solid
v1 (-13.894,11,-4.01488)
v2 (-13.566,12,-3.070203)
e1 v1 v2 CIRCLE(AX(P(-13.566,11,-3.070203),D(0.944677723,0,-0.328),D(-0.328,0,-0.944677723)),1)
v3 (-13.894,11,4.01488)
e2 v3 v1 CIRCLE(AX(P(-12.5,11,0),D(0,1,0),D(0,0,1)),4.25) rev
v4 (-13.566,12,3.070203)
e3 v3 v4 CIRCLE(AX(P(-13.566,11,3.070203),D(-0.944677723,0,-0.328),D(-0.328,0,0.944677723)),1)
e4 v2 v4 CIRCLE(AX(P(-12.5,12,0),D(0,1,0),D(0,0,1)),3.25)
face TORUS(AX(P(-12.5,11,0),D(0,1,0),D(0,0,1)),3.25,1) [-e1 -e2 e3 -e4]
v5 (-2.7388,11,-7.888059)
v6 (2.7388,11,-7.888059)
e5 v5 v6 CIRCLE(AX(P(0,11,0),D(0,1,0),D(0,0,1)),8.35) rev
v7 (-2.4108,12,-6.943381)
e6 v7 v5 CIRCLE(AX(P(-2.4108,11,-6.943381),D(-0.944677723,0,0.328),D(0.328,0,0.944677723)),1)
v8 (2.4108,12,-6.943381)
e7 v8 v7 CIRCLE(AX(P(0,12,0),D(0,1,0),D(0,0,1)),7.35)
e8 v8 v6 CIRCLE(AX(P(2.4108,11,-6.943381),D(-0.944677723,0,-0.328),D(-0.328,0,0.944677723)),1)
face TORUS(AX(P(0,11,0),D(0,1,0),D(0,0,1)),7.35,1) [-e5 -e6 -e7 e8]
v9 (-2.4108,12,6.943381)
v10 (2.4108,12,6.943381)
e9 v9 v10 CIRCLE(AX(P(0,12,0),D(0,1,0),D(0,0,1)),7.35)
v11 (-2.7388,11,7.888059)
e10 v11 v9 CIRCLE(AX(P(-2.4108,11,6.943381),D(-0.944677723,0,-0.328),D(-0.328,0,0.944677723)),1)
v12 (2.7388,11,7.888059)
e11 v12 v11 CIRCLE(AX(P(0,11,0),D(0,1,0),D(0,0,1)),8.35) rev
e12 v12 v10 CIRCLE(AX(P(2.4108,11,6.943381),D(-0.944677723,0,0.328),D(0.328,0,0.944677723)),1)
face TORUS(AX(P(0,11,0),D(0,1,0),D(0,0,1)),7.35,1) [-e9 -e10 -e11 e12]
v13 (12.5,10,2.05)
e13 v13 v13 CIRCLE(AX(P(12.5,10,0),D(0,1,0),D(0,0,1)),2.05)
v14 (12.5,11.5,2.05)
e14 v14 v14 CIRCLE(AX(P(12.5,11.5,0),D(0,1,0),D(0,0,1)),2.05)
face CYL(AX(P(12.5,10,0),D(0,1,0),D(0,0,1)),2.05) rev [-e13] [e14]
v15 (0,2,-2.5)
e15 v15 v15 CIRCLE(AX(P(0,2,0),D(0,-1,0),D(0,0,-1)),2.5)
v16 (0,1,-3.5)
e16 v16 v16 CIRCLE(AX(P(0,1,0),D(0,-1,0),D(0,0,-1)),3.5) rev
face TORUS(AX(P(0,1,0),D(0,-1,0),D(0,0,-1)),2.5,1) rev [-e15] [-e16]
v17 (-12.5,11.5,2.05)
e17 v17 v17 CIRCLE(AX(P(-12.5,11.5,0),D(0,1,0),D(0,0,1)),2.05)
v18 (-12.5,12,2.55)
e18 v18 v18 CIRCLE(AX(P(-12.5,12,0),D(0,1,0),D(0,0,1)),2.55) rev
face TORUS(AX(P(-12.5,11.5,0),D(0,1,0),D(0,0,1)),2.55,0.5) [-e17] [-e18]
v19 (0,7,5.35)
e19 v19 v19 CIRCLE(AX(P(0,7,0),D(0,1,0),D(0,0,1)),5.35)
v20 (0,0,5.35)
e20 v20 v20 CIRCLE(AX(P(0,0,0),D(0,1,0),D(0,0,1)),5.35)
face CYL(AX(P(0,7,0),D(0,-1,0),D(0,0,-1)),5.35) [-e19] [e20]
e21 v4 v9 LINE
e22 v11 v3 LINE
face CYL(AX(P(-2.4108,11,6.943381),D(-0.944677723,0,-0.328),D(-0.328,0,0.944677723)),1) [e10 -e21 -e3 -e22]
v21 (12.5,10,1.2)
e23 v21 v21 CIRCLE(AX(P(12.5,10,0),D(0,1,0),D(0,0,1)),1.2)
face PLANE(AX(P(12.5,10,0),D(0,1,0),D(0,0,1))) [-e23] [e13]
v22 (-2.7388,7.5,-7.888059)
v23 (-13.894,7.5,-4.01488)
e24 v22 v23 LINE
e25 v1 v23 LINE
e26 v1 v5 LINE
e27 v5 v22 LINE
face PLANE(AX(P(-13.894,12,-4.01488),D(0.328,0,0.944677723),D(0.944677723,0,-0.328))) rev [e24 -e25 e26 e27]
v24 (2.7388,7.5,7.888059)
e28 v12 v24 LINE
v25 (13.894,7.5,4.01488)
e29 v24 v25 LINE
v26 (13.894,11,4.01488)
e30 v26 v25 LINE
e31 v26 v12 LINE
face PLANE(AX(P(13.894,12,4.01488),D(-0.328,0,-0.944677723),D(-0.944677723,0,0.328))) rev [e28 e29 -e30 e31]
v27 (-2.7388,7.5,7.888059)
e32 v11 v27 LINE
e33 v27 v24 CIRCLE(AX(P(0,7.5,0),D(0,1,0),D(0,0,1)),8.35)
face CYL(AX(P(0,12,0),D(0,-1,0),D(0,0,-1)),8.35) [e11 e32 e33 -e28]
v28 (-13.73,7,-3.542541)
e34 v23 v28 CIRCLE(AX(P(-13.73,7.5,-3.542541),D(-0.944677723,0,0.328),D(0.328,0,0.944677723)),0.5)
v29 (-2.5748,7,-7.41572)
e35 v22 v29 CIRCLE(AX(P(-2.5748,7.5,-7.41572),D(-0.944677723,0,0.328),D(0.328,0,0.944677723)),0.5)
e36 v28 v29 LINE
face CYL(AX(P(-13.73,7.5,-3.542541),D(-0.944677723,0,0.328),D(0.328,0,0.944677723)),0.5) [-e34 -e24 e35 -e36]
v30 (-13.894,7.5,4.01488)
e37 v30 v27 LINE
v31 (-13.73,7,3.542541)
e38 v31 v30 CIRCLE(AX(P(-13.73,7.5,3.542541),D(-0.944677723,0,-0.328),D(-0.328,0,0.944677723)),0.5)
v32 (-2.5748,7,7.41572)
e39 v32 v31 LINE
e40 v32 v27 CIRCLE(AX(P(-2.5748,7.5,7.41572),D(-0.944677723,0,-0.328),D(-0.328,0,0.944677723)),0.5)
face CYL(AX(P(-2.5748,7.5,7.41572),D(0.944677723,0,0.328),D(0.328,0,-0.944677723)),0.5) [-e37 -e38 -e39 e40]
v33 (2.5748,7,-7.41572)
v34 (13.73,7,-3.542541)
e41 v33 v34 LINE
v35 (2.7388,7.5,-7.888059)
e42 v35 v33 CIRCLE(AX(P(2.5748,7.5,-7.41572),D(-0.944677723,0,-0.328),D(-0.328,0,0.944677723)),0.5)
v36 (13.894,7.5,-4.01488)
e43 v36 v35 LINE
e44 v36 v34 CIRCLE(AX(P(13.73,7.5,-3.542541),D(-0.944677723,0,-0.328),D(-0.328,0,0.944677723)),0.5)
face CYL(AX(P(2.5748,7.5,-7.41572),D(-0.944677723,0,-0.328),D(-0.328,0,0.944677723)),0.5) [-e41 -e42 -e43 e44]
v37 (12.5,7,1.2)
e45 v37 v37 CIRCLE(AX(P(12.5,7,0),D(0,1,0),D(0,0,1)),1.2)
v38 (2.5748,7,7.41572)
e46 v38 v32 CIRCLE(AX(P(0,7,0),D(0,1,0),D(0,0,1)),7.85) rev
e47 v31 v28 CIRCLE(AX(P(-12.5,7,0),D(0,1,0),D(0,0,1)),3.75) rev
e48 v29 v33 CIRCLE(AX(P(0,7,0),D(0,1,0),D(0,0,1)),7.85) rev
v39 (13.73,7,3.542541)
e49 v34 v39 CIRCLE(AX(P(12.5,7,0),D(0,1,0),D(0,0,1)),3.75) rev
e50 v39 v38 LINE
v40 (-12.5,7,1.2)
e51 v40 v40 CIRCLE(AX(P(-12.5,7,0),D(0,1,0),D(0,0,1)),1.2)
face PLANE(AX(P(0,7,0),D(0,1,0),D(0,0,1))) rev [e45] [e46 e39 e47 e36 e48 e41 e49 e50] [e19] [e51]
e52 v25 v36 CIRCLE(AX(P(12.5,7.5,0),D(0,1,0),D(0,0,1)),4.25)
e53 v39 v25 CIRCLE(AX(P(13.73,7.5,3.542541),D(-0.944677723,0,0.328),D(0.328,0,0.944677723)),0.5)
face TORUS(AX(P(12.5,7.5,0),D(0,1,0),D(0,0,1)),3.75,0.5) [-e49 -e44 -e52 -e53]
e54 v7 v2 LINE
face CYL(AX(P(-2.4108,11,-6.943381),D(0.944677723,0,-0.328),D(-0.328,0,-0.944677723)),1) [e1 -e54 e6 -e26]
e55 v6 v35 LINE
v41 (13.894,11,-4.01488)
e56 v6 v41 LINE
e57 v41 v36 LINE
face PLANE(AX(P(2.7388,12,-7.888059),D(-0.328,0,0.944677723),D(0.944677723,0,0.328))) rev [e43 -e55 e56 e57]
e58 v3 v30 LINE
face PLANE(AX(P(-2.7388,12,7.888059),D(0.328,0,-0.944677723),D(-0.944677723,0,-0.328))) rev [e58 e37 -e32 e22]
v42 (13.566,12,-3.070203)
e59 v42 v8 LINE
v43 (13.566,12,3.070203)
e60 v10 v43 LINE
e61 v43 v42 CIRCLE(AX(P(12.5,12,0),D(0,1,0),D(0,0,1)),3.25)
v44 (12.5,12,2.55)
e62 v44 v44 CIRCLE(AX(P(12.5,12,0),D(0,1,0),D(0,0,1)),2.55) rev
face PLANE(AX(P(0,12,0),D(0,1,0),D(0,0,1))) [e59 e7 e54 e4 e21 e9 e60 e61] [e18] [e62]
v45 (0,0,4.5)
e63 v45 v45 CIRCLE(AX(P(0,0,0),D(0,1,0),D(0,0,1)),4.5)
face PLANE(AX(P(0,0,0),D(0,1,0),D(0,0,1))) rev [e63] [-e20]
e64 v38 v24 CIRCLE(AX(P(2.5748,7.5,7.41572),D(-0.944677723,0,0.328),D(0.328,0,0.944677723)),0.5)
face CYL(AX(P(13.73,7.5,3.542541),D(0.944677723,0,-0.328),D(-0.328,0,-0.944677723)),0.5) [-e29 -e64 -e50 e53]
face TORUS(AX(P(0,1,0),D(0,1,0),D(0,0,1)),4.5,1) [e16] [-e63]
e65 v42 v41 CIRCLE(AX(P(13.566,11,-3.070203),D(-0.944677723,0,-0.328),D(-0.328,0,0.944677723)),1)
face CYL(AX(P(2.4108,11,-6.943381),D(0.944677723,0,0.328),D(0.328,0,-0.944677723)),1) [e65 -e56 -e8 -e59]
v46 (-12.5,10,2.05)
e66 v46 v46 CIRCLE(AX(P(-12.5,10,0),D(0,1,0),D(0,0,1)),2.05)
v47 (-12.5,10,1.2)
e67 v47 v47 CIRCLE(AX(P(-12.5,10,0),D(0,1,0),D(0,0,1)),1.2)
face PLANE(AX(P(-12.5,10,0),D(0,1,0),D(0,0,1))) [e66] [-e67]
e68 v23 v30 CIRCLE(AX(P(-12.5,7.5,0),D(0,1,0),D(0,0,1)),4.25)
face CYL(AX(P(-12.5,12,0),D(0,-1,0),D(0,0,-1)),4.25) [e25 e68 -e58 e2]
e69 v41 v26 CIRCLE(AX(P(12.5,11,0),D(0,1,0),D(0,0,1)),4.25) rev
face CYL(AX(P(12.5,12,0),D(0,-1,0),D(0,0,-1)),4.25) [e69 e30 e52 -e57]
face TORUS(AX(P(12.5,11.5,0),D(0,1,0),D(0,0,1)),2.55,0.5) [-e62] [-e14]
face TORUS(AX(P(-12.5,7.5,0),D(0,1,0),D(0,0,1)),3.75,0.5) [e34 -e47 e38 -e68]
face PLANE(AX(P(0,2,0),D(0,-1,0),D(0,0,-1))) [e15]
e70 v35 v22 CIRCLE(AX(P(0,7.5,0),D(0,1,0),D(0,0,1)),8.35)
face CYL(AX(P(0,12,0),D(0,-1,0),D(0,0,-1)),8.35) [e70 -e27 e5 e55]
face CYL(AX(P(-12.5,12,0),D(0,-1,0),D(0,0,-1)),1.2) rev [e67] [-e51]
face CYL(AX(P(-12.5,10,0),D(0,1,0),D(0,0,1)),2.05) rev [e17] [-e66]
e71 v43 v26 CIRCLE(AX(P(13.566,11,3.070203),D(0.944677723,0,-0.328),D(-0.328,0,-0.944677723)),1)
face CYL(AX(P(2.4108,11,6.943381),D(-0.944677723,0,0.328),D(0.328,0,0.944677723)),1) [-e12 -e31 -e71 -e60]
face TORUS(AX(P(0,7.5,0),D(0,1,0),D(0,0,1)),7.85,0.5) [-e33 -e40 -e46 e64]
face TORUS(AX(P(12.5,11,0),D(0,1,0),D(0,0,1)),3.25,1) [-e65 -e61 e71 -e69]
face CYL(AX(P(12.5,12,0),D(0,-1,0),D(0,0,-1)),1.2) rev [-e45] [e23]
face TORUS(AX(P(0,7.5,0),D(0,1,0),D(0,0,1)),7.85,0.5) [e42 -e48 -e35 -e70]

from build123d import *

# Parameters (mm, degrees)
SKETCH1_R           = 5.35
BOSS_EXTRUDE1_DEPTH = 7
SKETCH2_R           = 1.2
BOSS_EXTRUDE2_DEPTH = 5
SKETCH3_R           = 2.05
CUT_EXTRUDE1_DEPTH  = 2
FILLET1_R           = 0.5
FILLET2_R           = 1
SKETCH4_R           = 3.5
CUT_EXTRUDE2_DEPTH  = 2
FILLET3_R           = 1


with BuildPart() as part:
    # Sketch1 → Boss-Extrude1 (new body)
    with BuildSketch(Plane(origin=(0, 0, 0), x_dir=(1, 0, 0), z_dir=(0, 1, 0))):
        with Locations(Location((0, 0, 0), (0, 0, 270))):
            Circle(SKETCH1_R)
    extrude(amount=BOSS_EXTRUDE1_DEPTH)

    # Sketch2 → Boss-Extrude2 (add)
    with BuildSketch(Plane(origin=(0, 7, 0), x_dir=(1, 0, 0), z_dir=(0, 1, 0))):
        with BuildLine():
            Line((2.7388, 7.888058986), (13.894, 4.014880322))
            ThreePointArc((13.894, 4.014880322), (16.75, 0), (13.894, -4.014880322))
            Line((13.894, -4.014880322), (2.7388, -7.888058986))
            ThreePointArc((2.7388, -7.888058986), (0, -8.35), (-2.7388, -7.888058986))
            Line((-2.7388, -7.888058986), (-13.894, -4.014880322))
            ThreePointArc((-13.894, -4.014880322), (-16.75, 0), (-13.894, 4.014880322))
            Line((-13.894, 4.014880322), (-2.7388, 7.888058986))
            ThreePointArc((-2.7388, 7.888058986), (0, 8.35), (2.7388, 7.888058986))
        make_face()
        with Locations(Location((12.5, 0, 0), (0, 0, 270))):
            Circle(SKETCH2_R, mode=Mode.SUBTRACT)
        with Locations(Location((-12.5, 0, 0), (0, 0, 270))):
            Circle(SKETCH2_R, mode=Mode.SUBTRACT)
    extrude(amount=BOSS_EXTRUDE2_DEPTH)

    # Sketch3 → Cut-Extrude1 (cut)
    with BuildSketch(Plane(origin=(0, 12, 0), x_dir=(1, 0, 0), z_dir=(0, 1, 0))):
        with Locations(Location((-12.5, 0, 0), (0, 0, 270))):
            Circle(SKETCH3_R)
        with Locations(Location((12.5, 0, 0), (0, 0, 270))):
            Circle(SKETCH3_R)
    extrude(amount=-CUT_EXTRUDE1_DEPTH, mode=Mode.SUBTRACT)

    # Fillet1
    fillet1_edges = [part.edges().sort_by_distance(p)[0] for p in [
        (-8.3164, 7, 5.951469654),
        (0, 7, 8.35),
        (8.3164, 7, 5.951469654),
        (16.75, 7, 0),
        (8.3164, 7, -5.951469654),
        (-12.5, 12, -2.05),
        (12.5, 12, -2.05),
        (0, 7, -8.35),
        (-8.3164, 7, -5.951469654),
        (-16.75, 7, 0),
    ]]
    fillet(fillet1_edges, radius=FILLET1_R)

    # Fillet2
    fillet2_edges = [part.edges().sort_by_distance(p)[0] for p in [
        (0, 12, -8.35),
        (-8.3164, 12, -5.951469654),
        (-16.75, 12, 0),
        (-8.3164, 12, 5.951469654),
        (0, 12, 8.35),
        (8.3164, 12, 5.951469654),
        (16.75, 12, 0),
        (8.3164, 12, -5.951469654),
    ]]
    fillet(fillet2_edges, radius=FILLET2_R)

    # Sketch4 → Cut-Extrude2 (cut)
    with BuildSketch(Plane.XZ):
        with Locations(Location((0, 0, 0), (0, 0, 270))):
            Circle(SKETCH4_R)
    extrude(amount=-CUT_EXTRUDE2_DEPTH, mode=Mode.SUBTRACT)

    # Fillet3
    fillet3_edges = [part.edges().sort_by_distance(p)[0] for p in [
        (0, 2, 3.5),
        (0, 0, 3.5),
    ]]
    fillet(fillet3_edges, radius=FILLET3_R - 0.0001)  # a hair under: the kernel refuses the full size


solid = part.part
